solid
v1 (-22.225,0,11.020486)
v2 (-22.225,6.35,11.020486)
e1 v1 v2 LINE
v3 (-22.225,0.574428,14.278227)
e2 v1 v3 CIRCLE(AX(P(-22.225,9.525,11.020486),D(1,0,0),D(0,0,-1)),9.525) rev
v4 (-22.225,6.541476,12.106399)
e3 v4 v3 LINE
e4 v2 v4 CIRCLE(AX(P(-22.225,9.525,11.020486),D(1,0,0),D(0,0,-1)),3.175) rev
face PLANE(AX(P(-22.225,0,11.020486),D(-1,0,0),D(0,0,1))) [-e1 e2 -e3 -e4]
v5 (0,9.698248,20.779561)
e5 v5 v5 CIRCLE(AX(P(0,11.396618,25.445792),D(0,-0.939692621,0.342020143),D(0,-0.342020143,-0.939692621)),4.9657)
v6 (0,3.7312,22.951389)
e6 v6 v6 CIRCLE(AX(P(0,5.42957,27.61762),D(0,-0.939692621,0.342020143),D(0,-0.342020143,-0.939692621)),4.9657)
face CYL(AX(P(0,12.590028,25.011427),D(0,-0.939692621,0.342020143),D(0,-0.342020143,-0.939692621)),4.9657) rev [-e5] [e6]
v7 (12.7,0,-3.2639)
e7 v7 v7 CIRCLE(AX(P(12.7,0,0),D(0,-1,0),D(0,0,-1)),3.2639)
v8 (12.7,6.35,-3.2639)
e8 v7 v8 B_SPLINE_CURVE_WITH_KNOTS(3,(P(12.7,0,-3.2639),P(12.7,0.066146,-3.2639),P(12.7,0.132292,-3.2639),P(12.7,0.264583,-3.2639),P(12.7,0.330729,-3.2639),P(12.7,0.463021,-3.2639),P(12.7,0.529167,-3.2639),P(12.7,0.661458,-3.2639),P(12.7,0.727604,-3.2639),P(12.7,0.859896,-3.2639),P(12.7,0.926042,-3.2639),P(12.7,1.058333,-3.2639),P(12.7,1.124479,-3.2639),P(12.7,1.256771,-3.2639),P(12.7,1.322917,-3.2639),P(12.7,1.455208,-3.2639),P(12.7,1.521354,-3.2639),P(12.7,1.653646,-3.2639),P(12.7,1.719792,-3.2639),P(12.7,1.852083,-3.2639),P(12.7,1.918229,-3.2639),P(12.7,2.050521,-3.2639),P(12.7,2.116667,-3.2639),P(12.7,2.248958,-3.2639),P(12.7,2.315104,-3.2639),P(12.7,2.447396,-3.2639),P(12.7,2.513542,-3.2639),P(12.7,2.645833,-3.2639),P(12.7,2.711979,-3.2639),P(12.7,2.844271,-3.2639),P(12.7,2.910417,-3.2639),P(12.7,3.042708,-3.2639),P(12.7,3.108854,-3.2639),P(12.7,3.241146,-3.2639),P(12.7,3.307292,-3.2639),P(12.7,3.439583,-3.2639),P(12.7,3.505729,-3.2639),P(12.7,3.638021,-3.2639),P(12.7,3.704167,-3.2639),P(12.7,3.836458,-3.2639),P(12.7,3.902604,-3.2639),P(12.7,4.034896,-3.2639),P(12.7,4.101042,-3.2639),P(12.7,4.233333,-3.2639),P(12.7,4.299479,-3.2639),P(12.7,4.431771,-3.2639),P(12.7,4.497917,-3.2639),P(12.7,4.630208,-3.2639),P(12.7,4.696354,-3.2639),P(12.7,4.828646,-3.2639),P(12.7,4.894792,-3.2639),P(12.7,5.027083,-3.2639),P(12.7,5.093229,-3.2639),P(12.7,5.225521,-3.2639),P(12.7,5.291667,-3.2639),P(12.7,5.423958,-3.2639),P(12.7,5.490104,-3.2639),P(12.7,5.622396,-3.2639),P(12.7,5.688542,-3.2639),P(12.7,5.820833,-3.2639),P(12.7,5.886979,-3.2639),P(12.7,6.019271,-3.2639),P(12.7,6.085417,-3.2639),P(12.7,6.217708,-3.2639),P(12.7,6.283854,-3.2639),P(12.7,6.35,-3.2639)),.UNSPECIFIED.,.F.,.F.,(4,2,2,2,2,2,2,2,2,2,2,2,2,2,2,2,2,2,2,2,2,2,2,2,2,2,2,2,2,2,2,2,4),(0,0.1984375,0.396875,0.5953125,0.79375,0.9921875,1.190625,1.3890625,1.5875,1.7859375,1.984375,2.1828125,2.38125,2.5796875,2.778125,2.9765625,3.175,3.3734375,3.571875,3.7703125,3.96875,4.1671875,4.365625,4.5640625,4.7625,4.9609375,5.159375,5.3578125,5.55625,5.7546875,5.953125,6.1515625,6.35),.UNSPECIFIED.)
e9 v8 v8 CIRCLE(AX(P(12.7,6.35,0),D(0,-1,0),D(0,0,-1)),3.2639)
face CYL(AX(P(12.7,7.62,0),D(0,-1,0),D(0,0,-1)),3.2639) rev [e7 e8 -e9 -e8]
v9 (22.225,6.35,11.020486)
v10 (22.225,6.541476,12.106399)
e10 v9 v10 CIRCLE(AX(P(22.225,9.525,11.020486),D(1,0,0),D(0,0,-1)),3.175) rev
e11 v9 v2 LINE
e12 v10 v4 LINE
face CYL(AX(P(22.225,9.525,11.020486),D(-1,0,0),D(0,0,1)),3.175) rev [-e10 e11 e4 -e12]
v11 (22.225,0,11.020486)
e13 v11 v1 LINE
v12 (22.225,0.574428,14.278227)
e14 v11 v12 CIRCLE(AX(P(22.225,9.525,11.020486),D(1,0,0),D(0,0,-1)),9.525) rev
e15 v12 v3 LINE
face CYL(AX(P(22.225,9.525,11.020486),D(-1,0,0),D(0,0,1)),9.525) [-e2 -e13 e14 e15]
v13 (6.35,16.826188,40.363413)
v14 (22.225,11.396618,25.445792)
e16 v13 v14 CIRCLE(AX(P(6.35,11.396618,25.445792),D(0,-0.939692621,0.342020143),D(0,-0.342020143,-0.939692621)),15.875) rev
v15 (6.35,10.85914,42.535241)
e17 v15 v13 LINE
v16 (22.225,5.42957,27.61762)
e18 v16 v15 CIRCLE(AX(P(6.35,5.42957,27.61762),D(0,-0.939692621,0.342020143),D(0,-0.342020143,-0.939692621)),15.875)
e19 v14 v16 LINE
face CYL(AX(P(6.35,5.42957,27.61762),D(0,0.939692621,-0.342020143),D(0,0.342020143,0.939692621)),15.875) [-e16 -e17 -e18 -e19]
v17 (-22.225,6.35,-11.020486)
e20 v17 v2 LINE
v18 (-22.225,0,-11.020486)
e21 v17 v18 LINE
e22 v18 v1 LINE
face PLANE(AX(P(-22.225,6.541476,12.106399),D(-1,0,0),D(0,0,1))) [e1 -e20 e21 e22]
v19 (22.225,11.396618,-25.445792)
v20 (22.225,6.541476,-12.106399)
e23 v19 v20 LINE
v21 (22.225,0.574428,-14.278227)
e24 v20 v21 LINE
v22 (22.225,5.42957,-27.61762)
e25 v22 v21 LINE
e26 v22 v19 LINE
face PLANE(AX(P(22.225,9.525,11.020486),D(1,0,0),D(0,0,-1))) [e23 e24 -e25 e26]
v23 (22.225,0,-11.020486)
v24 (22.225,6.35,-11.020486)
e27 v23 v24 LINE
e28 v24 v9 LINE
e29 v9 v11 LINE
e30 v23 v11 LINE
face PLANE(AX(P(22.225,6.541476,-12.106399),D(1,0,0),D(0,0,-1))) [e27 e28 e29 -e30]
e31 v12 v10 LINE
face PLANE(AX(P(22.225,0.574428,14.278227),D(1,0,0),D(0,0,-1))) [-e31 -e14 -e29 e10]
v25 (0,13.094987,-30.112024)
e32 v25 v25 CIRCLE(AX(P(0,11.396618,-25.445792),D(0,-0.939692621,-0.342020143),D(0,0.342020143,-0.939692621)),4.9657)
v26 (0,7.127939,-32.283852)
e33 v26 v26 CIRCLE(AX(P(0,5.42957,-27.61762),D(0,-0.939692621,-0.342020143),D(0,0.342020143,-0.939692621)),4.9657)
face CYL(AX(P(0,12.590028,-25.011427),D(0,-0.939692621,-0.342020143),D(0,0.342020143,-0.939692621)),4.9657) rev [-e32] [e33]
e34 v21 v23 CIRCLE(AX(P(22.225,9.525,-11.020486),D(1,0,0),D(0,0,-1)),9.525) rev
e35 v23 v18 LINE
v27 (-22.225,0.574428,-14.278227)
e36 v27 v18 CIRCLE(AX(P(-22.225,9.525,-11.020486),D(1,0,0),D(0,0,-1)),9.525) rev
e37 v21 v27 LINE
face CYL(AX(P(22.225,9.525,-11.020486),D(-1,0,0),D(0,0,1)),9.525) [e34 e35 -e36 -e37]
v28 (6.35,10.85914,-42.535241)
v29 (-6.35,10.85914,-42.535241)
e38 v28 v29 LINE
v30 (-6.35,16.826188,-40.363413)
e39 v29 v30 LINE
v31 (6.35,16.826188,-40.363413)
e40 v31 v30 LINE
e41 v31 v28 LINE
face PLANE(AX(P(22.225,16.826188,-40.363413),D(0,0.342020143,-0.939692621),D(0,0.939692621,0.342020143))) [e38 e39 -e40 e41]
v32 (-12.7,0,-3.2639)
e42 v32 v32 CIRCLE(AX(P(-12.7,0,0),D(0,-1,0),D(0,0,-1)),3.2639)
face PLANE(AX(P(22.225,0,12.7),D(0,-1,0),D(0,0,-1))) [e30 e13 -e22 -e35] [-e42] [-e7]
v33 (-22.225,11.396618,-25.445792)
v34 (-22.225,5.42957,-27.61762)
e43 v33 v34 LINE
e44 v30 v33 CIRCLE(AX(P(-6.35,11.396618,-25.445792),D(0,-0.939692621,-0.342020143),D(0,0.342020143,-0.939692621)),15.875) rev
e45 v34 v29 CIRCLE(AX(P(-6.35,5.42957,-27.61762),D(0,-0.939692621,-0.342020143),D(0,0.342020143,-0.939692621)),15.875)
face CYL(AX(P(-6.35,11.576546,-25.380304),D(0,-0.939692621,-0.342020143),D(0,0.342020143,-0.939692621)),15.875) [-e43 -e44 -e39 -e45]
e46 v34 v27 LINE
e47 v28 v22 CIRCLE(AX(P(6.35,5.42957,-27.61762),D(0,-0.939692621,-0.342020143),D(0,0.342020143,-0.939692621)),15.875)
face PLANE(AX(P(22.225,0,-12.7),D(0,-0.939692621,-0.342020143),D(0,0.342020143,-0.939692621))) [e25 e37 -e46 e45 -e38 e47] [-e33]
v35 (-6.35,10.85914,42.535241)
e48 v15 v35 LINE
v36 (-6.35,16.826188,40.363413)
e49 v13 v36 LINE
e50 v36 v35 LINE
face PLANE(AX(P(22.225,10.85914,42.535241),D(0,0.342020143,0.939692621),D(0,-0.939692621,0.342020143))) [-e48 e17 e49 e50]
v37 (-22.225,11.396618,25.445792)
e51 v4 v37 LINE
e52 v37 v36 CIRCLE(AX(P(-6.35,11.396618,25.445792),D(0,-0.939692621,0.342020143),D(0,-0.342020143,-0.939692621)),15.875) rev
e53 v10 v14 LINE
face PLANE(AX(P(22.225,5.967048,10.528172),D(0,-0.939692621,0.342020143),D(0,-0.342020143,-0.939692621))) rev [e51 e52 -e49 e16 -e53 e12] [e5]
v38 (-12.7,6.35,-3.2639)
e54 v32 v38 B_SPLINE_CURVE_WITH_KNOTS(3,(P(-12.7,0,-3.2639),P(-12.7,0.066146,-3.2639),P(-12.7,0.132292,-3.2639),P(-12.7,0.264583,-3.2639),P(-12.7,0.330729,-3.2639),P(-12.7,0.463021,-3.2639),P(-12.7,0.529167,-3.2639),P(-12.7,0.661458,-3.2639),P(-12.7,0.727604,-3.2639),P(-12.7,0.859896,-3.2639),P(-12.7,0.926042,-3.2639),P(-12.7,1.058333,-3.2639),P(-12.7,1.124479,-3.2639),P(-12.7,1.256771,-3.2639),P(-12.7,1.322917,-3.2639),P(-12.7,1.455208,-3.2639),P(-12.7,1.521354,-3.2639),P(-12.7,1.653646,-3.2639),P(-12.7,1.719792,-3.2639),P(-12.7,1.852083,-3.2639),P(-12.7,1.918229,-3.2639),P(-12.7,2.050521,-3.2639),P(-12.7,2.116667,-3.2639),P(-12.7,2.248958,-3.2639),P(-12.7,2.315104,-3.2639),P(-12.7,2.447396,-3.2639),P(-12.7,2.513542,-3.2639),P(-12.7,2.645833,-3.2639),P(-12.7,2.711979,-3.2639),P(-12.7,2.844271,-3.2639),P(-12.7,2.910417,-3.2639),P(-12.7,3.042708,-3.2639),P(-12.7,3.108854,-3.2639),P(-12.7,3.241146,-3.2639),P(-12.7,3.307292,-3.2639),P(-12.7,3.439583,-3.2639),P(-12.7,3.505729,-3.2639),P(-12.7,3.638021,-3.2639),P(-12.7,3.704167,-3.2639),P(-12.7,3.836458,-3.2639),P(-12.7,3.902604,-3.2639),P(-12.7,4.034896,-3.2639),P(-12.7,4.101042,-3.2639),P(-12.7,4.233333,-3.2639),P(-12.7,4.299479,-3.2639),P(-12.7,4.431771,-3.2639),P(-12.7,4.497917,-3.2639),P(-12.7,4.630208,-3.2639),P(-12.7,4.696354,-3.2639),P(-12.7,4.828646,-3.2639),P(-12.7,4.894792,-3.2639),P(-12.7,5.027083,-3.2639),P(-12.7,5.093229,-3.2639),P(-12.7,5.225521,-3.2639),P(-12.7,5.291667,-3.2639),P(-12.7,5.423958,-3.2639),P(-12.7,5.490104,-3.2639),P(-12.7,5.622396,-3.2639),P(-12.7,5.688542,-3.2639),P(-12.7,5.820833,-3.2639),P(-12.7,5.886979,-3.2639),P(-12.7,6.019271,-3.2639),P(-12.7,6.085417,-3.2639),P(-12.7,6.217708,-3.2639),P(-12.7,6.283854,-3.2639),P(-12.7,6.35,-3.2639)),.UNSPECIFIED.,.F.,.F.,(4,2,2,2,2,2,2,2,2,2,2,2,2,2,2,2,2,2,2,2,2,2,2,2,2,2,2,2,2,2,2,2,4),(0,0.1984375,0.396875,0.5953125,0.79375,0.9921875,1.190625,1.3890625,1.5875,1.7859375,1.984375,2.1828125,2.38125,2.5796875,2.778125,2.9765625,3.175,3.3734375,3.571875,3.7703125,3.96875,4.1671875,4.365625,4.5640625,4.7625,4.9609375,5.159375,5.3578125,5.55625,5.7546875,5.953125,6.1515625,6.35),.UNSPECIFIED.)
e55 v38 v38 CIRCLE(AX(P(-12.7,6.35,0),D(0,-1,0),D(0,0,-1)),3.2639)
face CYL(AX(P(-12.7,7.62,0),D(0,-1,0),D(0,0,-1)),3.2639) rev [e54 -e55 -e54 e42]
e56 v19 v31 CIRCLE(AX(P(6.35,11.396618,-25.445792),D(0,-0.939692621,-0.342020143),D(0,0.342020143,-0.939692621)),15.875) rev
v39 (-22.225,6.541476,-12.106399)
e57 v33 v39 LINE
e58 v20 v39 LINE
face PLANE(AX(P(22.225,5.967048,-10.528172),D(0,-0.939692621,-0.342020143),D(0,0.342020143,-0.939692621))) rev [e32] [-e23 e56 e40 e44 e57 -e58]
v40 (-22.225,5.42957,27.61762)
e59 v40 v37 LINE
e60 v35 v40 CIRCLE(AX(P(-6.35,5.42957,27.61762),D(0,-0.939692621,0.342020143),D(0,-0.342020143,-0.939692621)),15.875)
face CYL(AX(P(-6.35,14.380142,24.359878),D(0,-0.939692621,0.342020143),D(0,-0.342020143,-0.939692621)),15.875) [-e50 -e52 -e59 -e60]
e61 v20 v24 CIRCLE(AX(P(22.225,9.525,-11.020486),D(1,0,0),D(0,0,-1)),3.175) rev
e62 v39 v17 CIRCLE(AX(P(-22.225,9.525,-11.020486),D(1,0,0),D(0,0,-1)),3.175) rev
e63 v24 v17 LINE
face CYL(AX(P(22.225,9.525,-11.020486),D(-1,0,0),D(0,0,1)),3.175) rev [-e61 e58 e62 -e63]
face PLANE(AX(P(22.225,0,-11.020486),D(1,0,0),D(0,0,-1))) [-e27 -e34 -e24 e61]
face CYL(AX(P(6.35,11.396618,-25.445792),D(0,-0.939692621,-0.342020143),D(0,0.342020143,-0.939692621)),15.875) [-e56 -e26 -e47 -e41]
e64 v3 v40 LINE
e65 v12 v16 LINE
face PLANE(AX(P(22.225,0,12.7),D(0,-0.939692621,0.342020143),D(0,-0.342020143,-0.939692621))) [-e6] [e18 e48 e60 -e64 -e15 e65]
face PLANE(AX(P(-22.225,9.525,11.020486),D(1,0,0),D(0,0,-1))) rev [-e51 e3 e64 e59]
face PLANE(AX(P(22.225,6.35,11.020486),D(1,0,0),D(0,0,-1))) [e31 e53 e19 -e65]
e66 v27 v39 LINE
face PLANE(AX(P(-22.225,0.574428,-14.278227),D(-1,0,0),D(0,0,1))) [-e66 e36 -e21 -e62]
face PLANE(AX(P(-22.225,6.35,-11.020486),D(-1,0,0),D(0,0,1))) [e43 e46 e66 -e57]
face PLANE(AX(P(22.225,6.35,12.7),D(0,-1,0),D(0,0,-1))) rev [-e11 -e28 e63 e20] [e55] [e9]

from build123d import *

# Parameters (mm, degrees)
BASE_FLANGE1_DEPTH = 22.225
FILLET1_R          = 15.875
SKETCH6_R          = 4.9657
CUT_EXTRUDE1_DEPTH = 7.62
SKETCH7_R          = 4.9657
CUT_EXTRUDE2_DEPTH = 7.62
SKETCH8_R          = 3.2639
CUT_EXTRUDE3_DEPTH = 7.62


# Sheet-metal steps are written as plain solids
with BuildPart() as part:
    # Sketch1 → Base-Flange1 (new, symmetric)
    with BuildSketch(Plane(origin=(0, 0, 0), x_dir=(0, 0, -1), z_dir=(1, 0, 0))):
        with BuildLine():
            Line((-42.53524071, 10.859139551), (-14.278227374, 0.574427787))
            ThreePointArc((-14.278227374, 0.574427787), (-12.674484401, 0.144706153), (-11.020485509, 0))
            Line((-11.020485509, 0), (11.020485509, 0))
            ThreePointArc((11.020485509, 0), (12.674484401, 0.144706153), (14.278227374, 0.574427787))
            Line((14.278227374, 0.574427787), (42.53524071, 10.859139551))
            Line((42.53524071, 10.859139551), (40.3634128, 16.826187693))
            Line((40.3634128, 16.826187693), (12.106399464, 6.541475929))
            ThreePointArc((12.106399464, 6.541475929), (11.571818473, 6.398235384), (11.020485509, 6.35))
            Line((11.020485509, 6.35), (-11.020485509, 6.35))
            ThreePointArc((-11.020485509, 6.35), (-11.571818473, 6.398235384), (-12.106399464, 6.541475929))
            Line((-12.106399464, 6.541475929), (-40.3634128, 16.826187693))
            Line((-40.3634128, 16.826187693), (-42.53524071, 10.859139551))
        make_face()
    extrude(amount=BASE_FLANGE1_DEPTH, both=True)

    # Fillet1
    fillet1_edges = [part.edges().sort_by_distance(p)[0] for p in [
        (-22.225, 13.842663622, -41.449326755),
        (-22.225, 13.842663622, 41.449326755),
        (22.225, 13.842663622, -41.449326755),
        (22.225, 13.842663622, 41.449326755),
    ]]
    fillet(fillet1_edges, radius=FILLET1_R)

    # Sketch6 → Cut-Extrude1 (cut)
    with BuildSketch(Plane(origin=(0, -4.081701322, -1.485617786), x_dir=(1, 0, 0), z_dir=(0, -0.9396926207859082, -0.34202014332566943))):
        with Locations(Location((0, -27.809096284, 0), (0, 0, 270))):
            Circle(SKETCH6_R)
    extrude(amount=-CUT_EXTRUDE1_DEPTH, mode=Mode.SUBTRACT)

    # Sketch7 → Cut-Extrude2 (cut)
    with BuildSketch(Plane(origin=(0, -4.081701322, 1.485617786), x_dir=(1, 0, 0), z_dir=(0, -0.9396926207859082, 0.34202014332566943))):
        with Locations(Location((0, 27.809096284, 0), (0, 0, 270))):
            Circle(SKETCH7_R)
    extrude(amount=-CUT_EXTRUDE2_DEPTH, mode=Mode.SUBTRACT)

    # Sketch8 → Cut-Extrude3 (cut)
    with BuildSketch(Plane.XZ):
        with Locations(Location((-12.7, 0, 0), (0, 0, 270))):
            Circle(SKETCH8_R)
        with Locations(Location((12.7, 0, 0), (0, 0, 270))):
            Circle(SKETCH8_R)
    extrude(amount=-CUT_EXTRUDE3_DEPTH, mode=Mode.SUBTRACT)


solid = part.part
